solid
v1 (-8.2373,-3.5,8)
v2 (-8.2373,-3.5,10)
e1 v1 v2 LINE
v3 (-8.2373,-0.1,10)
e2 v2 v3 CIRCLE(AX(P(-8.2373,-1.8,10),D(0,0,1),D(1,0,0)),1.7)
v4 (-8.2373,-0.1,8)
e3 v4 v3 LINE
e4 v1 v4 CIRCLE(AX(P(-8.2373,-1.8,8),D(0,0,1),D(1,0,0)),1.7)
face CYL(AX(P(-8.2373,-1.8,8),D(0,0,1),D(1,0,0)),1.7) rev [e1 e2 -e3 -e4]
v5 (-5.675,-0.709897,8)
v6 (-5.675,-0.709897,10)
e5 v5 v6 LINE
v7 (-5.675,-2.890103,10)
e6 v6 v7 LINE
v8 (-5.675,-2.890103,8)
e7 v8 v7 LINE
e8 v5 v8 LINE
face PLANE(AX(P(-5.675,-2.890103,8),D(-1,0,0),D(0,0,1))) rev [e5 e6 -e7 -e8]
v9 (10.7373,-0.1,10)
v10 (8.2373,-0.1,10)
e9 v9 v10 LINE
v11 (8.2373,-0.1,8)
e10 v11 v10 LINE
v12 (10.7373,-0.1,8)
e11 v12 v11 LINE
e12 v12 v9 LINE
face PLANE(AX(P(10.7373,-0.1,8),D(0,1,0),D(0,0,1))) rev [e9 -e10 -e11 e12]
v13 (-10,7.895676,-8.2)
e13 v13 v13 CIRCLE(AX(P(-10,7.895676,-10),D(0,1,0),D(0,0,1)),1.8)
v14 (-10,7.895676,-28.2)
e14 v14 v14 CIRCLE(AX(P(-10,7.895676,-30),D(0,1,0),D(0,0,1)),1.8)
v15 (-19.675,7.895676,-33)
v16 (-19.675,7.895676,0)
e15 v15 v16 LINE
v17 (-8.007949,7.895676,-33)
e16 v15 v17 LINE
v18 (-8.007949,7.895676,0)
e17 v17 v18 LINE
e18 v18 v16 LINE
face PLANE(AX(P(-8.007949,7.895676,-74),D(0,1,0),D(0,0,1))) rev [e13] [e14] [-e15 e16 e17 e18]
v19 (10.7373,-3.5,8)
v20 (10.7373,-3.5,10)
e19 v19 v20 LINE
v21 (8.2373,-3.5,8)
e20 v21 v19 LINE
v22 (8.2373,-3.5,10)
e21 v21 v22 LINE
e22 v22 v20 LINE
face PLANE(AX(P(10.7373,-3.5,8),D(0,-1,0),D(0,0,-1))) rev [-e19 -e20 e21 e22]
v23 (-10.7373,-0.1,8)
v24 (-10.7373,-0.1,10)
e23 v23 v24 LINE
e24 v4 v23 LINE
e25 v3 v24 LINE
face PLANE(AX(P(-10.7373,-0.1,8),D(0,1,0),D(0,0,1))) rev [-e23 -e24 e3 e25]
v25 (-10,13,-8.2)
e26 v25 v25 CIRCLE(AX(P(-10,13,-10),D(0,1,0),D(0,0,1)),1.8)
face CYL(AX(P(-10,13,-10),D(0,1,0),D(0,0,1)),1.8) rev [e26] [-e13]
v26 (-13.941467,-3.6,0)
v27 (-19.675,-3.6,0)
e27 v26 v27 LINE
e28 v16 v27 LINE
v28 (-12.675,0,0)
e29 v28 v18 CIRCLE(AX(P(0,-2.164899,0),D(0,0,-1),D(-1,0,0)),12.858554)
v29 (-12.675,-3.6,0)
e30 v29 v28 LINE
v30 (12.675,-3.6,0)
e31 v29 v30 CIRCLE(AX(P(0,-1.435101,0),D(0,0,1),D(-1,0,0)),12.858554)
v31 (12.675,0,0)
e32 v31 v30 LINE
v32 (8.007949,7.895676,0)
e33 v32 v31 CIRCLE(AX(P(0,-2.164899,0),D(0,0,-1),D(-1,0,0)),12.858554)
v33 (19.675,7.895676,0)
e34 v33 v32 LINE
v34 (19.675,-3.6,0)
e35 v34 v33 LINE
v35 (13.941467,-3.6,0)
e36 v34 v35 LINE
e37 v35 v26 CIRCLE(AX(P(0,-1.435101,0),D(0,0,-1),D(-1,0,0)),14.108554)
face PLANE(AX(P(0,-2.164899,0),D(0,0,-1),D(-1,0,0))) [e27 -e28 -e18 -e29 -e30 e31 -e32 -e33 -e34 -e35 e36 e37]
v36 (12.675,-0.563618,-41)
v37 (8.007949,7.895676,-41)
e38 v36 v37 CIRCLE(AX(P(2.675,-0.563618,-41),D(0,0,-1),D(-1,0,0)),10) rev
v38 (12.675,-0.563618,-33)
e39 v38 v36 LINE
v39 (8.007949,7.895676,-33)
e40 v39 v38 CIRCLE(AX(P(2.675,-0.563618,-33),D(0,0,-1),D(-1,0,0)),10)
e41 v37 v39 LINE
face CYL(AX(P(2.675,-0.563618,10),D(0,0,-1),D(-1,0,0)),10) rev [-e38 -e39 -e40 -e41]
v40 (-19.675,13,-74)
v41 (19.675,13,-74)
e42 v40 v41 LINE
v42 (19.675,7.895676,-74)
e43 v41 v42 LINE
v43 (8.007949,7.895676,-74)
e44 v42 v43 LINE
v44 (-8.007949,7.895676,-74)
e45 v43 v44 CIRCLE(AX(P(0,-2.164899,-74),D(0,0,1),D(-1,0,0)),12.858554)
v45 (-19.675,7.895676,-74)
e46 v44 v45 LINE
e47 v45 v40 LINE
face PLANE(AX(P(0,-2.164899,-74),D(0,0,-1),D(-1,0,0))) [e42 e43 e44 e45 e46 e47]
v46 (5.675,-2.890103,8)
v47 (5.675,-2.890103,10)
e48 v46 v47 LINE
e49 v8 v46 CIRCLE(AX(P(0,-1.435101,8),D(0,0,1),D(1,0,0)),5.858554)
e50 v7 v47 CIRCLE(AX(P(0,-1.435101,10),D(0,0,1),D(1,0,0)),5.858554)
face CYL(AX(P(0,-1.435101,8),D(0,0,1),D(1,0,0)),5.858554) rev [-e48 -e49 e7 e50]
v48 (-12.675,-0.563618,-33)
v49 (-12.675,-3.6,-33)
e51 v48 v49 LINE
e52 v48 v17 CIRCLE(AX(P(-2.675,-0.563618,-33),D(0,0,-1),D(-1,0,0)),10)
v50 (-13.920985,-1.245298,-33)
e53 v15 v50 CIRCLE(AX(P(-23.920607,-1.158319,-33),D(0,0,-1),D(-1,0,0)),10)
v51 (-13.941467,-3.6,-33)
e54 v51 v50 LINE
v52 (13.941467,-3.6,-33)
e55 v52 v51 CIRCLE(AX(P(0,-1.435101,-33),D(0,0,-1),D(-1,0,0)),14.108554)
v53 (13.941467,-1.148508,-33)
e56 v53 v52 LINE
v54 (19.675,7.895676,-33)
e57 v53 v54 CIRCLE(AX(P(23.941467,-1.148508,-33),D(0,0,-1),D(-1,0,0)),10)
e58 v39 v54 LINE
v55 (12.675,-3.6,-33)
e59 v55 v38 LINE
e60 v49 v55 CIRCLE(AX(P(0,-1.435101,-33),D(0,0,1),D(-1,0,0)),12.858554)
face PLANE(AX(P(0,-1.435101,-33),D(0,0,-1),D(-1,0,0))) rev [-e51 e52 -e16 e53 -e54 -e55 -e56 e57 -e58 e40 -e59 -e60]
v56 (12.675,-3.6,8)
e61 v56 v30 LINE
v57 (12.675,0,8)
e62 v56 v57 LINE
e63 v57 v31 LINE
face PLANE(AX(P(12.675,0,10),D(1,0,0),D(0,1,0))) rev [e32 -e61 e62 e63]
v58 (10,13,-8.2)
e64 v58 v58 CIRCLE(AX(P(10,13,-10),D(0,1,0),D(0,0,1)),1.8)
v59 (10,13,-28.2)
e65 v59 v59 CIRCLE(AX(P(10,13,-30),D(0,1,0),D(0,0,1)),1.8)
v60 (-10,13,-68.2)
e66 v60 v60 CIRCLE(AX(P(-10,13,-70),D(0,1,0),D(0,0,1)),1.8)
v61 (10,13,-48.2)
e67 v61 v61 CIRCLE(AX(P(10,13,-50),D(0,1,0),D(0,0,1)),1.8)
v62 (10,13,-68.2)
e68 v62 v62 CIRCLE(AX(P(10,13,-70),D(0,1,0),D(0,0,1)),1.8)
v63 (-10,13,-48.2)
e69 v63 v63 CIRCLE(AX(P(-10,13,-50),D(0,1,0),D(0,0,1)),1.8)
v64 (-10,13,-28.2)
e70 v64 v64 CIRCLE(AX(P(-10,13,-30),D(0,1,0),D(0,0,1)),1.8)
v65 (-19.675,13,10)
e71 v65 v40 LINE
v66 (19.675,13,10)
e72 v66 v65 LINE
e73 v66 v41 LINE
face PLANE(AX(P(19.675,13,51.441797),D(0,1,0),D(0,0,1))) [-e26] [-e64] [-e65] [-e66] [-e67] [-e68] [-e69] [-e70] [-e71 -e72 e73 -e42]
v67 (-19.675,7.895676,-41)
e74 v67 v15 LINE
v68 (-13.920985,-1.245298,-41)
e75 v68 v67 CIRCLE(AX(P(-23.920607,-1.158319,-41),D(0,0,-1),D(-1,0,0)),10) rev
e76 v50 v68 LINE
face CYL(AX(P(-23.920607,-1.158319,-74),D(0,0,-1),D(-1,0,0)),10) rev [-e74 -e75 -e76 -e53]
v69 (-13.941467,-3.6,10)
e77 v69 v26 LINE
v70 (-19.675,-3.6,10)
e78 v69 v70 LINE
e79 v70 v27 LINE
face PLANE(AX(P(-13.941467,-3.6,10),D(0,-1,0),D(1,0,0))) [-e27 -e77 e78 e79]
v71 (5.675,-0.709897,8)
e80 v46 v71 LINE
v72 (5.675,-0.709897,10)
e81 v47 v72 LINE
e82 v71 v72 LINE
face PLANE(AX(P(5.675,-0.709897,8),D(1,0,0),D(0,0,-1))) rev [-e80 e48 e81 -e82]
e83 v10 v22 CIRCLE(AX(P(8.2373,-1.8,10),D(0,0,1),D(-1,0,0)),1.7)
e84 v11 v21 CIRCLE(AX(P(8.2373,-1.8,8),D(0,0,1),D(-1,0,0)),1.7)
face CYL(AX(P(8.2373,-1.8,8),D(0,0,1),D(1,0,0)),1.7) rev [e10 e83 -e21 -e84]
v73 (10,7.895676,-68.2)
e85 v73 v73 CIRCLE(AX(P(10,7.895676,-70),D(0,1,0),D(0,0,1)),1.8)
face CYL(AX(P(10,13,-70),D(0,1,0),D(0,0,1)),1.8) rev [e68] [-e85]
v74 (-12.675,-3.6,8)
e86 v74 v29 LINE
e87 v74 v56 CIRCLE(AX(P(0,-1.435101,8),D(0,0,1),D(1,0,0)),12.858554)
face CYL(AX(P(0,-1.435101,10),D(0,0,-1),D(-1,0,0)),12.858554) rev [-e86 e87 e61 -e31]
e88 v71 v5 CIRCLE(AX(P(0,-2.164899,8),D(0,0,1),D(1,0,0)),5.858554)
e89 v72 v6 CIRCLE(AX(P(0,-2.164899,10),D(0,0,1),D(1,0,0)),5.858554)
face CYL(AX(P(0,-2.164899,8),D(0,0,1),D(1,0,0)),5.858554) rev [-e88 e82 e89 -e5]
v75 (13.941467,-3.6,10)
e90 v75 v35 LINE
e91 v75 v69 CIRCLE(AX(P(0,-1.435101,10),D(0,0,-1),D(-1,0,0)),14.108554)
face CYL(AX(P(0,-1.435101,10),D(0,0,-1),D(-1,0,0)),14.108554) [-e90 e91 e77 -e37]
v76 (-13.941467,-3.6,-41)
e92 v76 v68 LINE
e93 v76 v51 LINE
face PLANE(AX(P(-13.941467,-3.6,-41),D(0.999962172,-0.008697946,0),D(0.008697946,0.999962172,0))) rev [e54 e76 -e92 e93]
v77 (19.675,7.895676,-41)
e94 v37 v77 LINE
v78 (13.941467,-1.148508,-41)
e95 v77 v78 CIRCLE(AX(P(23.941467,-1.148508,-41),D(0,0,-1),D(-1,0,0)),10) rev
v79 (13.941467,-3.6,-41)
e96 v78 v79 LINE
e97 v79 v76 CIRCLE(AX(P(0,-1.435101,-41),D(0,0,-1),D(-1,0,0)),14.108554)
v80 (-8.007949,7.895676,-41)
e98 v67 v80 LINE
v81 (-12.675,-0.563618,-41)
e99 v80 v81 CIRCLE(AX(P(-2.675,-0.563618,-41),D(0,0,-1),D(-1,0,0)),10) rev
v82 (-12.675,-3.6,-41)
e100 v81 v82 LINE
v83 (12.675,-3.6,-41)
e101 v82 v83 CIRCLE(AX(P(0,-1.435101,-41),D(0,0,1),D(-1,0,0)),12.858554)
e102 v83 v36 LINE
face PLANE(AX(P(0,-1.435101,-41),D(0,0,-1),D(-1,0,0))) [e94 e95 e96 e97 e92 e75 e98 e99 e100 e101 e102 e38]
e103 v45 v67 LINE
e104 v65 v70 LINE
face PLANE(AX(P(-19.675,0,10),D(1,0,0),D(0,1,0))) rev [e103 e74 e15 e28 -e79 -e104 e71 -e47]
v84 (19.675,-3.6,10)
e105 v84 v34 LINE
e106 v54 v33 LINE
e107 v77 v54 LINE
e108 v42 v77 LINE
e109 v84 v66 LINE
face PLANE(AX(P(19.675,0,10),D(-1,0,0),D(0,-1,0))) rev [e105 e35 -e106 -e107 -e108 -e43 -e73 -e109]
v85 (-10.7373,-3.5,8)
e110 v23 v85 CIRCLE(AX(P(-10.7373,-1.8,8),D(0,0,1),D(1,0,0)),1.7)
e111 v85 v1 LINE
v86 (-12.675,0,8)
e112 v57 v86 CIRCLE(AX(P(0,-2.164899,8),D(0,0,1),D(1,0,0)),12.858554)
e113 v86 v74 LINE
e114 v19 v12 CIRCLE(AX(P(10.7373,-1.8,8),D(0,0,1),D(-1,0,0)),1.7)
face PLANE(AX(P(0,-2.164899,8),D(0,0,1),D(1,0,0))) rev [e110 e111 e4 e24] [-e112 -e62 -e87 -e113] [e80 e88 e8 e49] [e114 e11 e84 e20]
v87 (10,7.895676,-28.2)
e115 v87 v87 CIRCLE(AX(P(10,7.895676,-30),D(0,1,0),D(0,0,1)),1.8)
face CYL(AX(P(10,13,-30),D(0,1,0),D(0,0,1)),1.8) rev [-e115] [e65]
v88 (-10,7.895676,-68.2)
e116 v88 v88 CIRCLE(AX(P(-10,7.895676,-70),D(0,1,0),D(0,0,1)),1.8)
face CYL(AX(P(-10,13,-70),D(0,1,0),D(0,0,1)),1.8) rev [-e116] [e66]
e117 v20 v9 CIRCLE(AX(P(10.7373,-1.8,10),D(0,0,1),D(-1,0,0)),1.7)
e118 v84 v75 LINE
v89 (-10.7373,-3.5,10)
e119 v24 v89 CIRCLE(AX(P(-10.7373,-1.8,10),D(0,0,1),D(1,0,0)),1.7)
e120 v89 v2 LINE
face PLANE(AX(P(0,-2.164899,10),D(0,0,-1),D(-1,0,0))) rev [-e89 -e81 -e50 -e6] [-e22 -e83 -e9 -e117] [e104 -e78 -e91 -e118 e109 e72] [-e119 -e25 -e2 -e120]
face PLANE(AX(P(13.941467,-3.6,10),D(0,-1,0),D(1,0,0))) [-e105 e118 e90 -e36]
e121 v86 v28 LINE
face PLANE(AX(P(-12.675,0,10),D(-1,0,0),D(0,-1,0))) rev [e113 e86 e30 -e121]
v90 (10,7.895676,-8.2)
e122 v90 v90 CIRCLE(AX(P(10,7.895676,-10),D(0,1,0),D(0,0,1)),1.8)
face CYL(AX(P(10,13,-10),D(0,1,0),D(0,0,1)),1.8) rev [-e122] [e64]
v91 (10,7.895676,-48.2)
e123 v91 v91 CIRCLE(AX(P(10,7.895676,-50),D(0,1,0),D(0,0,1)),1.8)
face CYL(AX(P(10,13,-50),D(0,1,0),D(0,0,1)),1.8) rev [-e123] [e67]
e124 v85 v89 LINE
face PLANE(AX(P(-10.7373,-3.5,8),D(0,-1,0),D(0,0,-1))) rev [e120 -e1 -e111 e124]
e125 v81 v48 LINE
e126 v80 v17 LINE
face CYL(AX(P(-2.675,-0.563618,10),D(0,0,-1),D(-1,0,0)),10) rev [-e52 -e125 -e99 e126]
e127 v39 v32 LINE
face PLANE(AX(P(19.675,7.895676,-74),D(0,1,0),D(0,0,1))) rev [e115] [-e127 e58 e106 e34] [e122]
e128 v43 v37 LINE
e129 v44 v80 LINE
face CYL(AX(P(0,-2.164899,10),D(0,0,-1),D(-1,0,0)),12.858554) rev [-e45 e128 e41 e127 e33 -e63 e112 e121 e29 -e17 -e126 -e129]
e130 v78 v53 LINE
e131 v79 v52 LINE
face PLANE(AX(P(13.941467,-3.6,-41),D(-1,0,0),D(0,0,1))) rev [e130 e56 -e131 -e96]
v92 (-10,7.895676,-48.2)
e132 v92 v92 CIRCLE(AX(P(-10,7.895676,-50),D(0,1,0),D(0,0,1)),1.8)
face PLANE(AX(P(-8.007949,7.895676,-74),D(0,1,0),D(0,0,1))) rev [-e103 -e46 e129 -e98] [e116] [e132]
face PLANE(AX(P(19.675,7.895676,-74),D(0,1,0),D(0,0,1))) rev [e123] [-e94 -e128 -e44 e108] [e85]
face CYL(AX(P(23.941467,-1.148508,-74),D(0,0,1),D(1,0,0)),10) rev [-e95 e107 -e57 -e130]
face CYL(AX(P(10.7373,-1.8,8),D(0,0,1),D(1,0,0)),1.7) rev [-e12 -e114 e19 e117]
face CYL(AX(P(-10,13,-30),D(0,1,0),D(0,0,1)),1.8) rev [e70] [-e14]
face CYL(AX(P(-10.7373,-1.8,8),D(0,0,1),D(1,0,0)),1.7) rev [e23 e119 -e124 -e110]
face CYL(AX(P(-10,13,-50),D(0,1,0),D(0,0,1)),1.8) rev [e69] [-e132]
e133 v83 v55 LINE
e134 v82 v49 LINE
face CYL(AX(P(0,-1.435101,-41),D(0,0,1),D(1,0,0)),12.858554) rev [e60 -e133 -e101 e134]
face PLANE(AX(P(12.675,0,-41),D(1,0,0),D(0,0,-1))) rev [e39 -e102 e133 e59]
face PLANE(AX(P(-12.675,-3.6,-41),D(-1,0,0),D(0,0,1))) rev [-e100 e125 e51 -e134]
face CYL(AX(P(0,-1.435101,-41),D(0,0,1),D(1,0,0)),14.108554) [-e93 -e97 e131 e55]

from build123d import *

# Parameters (mm, degrees)
BOSS_EXTRUDE1_DEPTH  = 10
BOSS_EXTRUDE3_DEPTH  = 10
BOSS_EXTRUDE4_START  = 74
BOSS_EXTRUDE4_DEPTH  = 74
M3_CLEARANCE_HOLE1_D = 3.6
LPATTERN1_COUNT      = 4
LPATTERN1_PITCH      = 20
BOSS_EXTRUDE6_START  = -2
BOSS_EXTRUDE6_DEPTH  = 2
BOSS_EXTRUDE7_START  = 8
BOSS_EXTRUDE7_DEPTH  = 8
FILLET1_R            = 10


with BuildPart() as part:
    # Sketch1 → Boss-Extrude1 (new body)
    with BuildSketch(Plane.XY):
        with BuildLine():
            Line((-13.941467283, 0), (-19.675, 0))
            Line((-19.675, 0), (-19.675, -1.8))
            Line((-19.675, -1.8), (-12.675, -1.8))
            Line((-12.675, -1.8), (-12.675, 0))
            ThreePointArc((-12.675, 0), (0, 10.693655384), (12.675, 0))
            Line((12.675, 0), (12.675, -1.8))
            Line((12.675, -1.8), (19.675, -1.8))
            Line((19.675, -1.8), (19.675, 0))
            Line((19.675, 0), (13.941467283, 0))
            ThreePointArc((13.941467283, 0), (0, 11.943655384), (-13.941467283, 0))
        make_face()
    boss_extrude1 = extrude(amount=BOSS_EXTRUDE1_DEPTH)

    # Mirror1: Boss-Extrude1 across plane
    add(boss_extrude1.mirror(Plane(origin=(-12.675, -1.8, 10), x_dir=(0, 0, 1), z_dir=(0, 1, 0))))

    # Sketch6 → Boss-Extrude3 (add)
    with BuildSketch(Plane(origin=(0, 0, 0), x_dir=(-1, 0, 0), z_dir=(0, 0, -1))):
        with BuildLine():
            Line((13.941467283, 0), (19.675, 0))
            Line((19.675, 0), (19.675, 13))
            Line((19.675, 13), (-19.675, 13))
            Line((-19.675, 13), (-19.675, 0))
            Line((-19.675, 0), (-13.941467283, 0))
            ThreePointArc((-13.941467283, 0), (0, 11.943655384), (13.941467283, 0))
        make_face()
    extrude(amount=-BOSS_EXTRUDE3_DEPTH)

    # Sketch15 → Boss-Extrude4 (add)
    with BuildSketch(Plane(origin=(0, 0, 0), x_dir=(-1, 0, 0), z_dir=(0, 0, -1)).offset(BOSS_EXTRUDE4_START)):
        with BuildLine():
            Line((8.007949472, 7.895675733), (19.675, 7.895675733))
            Line((19.675, 7.895675733), (19.675, 13))
            Line((19.675, 13), (-19.675, 13))
            Line((-19.675, 13), (-19.675, 7.895675733))
            Line((-19.675, 7.895675733), (-8.007949472, 7.895675733))
            ThreePointArc((-8.007949472, 7.895675733), (0, 10.693655384), (8.007949472, 7.895675733))
        make_face()
    extrude(amount=-BOSS_EXTRUDE4_DEPTH)

    # M3 Clearance Hole1 (through all)
    with Locations(Plane(origin=(0, 13, 0), x_dir=(1, 0, 0), z_dir=(0, 1, 0))):
        with Locations((-10, 10), (10, 10)):
            m3_clearance_hole1 = Hole(M3_CLEARANCE_HOLE1_D / 2)

    # LPattern1: M3 Clearance Hole1 ×4
    with Locations(*[(0, 0, -i * LPATTERN1_PITCH) for i in range(1, LPATTERN1_COUNT)]):
        add(m3_clearance_hole1, mode=Mode.SUBTRACT)

    # Sketch17 → Boss-Extrude6 (add)
    with BuildSketch(Plane.XY.offset(10).offset(BOSS_EXTRUDE6_START)):
        with BuildLine():
            Line((12.675, 0), (12.675, -3.6))
            ThreePointArc((12.675, -3.6), (0, -14.293655384), (-12.675, -3.6))
            Line((-12.675, -3.6), (-12.675, 0))
            ThreePointArc((-12.675, 0), (0, 10.693655384), (12.675, 0))
        make_face()
        with BuildLine():
            Line((5.675, -0.709896901), (5.675, -2.890103099))
            ThreePointArc((5.675, -2.890103099), (0, -7.293655384), (-5.675, -2.890103099))
            Line((-5.675, -2.890103099), (-5.675, -0.709896901))
            ThreePointArc((-5.675, -0.709896901), (0, 3.693655384), (5.675, -0.709896901))
        make_face(mode=Mode.SUBTRACT)
        with BuildLine():
            Line((-10.737300272, -0.1), (-8.237300272, -0.1))
            ThreePointArc((-8.237300272, -0.1), (-6.537300272, -1.8), (-8.237300272, -3.5))
            Line((-8.237300272, -3.5), (-10.737300272, -3.5))
            ThreePointArc((-10.737300272, -3.5), (-12.437300272, -1.8), (-10.737300272, -0.1))
        make_face(mode=Mode.SUBTRACT)
        with BuildLine():
            Line((10.737300272, -0.1), (8.237300272, -0.1))
            ThreePointArc((8.237300272, -0.1), (6.537300272, -1.8), (8.237300272, -3.5))
            Line((8.237300272, -3.5), (10.737300272, -3.5))
            ThreePointArc((10.737300272, -3.5), (12.437300272, -1.8), (10.737300272, -0.1))
        make_face(mode=Mode.SUBTRACT)
    extrude(amount=BOSS_EXTRUDE6_DEPTH)

    # Sketch18 → Boss-Extrude7 (add)
    with BuildSketch(Plane(origin=(0, 0, -33), x_dir=(-1, 0, 0), z_dir=(0, 0, -1)).offset(BOSS_EXTRUDE7_START)):
        with BuildLine():
            Line((12.675, -3.6), (12.675, 0))
            Line((12.675, 0), (12.675, 7.895675733))
            Line((12.675, 7.895675733), (13.841474736, 7.895675733))
            Line((13.841474736, 7.895675733), (13.941467283, -3.6))
            ThreePointArc((13.941467283, -3.6), (0, -15.543655384), (-13.941467283, -3.6))
            Line((-13.941467283, -3.6), (-13.941467283, 7.895675733))
            Line((-13.941467283, 7.895675733), (-12.675, 7.895675733))
            Line((-12.675, 7.895675733), (-12.675, 0))
            Line((-12.675, 0), (-12.675, -3.6))
            ThreePointArc((-12.675, -3.6), (0, -14.293655384), (12.675, -3.6))
        make_face()
    extrude(amount=-BOSS_EXTRUDE7_DEPTH)

    # Fillet1
    # the kernel refuses this fillet: 10 mm, written as the material it adds along each edge
    with BuildSketch(Plane(origin=(12.675, 7.895675733, -41), x_dir=(-1, 0, 0), z_dir=(0, 0, 1))) as fillet1_piece_1:
        with BuildLine():
            CenterArc((10, 8.459293702), FILLET1_R, 180, 57.771647339)
            Line((0, 8.459293702), (0, 0))
            Line((0, 0), (4.667050528, 0))
        make_face()
    extrude(amount=8)
    with BuildSketch(Plane(origin=(13.941467283, 7.895675733, -41), x_dir=(1, 0, 0), z_dir=(0, 0, 1))) as fillet1_piece_2:
        with BuildLine():
            CenterArc((10, -9.044183596), FILLET1_R, 115.254940541, 64.745059459)
            Line((0, -9.044183596), (0, 0))
            Line((0, 0), (5.733532717, 0))
        make_face()
    extrude(amount=8)
    with BuildSketch(Plane(origin=(-13.841474736, 7.895675733, -41), x_dir=(-1, 0, 0), z_dir=(0, 0, 1))) as fillet1_piece_3:
        with BuildLine():
            CenterArc((10.079132427, 9.053994688), FILLET1_R, 179.501638131, 65.375500513)
            Line((0.079510705, 9.140974146), (0, 0))
            Line((0, 0), (5.833525264, 0))
        make_face()
    extrude(amount=8)
    with BuildSketch(Plane(origin=(-12.675, 7.895675733, -41), x_dir=(1, 0, 0), z_dir=(0, 0, 1))) as fillet1_piece_4:
        with BuildLine():
            CenterArc((10, -8.459293702), FILLET1_R, 122.228352661, 57.771647339)
            Line((0, -8.459293702), (0, 0))
            Line((0, 0), (4.667050528, 0))
        make_face()
    extrude(amount=8)


solid = part.part
